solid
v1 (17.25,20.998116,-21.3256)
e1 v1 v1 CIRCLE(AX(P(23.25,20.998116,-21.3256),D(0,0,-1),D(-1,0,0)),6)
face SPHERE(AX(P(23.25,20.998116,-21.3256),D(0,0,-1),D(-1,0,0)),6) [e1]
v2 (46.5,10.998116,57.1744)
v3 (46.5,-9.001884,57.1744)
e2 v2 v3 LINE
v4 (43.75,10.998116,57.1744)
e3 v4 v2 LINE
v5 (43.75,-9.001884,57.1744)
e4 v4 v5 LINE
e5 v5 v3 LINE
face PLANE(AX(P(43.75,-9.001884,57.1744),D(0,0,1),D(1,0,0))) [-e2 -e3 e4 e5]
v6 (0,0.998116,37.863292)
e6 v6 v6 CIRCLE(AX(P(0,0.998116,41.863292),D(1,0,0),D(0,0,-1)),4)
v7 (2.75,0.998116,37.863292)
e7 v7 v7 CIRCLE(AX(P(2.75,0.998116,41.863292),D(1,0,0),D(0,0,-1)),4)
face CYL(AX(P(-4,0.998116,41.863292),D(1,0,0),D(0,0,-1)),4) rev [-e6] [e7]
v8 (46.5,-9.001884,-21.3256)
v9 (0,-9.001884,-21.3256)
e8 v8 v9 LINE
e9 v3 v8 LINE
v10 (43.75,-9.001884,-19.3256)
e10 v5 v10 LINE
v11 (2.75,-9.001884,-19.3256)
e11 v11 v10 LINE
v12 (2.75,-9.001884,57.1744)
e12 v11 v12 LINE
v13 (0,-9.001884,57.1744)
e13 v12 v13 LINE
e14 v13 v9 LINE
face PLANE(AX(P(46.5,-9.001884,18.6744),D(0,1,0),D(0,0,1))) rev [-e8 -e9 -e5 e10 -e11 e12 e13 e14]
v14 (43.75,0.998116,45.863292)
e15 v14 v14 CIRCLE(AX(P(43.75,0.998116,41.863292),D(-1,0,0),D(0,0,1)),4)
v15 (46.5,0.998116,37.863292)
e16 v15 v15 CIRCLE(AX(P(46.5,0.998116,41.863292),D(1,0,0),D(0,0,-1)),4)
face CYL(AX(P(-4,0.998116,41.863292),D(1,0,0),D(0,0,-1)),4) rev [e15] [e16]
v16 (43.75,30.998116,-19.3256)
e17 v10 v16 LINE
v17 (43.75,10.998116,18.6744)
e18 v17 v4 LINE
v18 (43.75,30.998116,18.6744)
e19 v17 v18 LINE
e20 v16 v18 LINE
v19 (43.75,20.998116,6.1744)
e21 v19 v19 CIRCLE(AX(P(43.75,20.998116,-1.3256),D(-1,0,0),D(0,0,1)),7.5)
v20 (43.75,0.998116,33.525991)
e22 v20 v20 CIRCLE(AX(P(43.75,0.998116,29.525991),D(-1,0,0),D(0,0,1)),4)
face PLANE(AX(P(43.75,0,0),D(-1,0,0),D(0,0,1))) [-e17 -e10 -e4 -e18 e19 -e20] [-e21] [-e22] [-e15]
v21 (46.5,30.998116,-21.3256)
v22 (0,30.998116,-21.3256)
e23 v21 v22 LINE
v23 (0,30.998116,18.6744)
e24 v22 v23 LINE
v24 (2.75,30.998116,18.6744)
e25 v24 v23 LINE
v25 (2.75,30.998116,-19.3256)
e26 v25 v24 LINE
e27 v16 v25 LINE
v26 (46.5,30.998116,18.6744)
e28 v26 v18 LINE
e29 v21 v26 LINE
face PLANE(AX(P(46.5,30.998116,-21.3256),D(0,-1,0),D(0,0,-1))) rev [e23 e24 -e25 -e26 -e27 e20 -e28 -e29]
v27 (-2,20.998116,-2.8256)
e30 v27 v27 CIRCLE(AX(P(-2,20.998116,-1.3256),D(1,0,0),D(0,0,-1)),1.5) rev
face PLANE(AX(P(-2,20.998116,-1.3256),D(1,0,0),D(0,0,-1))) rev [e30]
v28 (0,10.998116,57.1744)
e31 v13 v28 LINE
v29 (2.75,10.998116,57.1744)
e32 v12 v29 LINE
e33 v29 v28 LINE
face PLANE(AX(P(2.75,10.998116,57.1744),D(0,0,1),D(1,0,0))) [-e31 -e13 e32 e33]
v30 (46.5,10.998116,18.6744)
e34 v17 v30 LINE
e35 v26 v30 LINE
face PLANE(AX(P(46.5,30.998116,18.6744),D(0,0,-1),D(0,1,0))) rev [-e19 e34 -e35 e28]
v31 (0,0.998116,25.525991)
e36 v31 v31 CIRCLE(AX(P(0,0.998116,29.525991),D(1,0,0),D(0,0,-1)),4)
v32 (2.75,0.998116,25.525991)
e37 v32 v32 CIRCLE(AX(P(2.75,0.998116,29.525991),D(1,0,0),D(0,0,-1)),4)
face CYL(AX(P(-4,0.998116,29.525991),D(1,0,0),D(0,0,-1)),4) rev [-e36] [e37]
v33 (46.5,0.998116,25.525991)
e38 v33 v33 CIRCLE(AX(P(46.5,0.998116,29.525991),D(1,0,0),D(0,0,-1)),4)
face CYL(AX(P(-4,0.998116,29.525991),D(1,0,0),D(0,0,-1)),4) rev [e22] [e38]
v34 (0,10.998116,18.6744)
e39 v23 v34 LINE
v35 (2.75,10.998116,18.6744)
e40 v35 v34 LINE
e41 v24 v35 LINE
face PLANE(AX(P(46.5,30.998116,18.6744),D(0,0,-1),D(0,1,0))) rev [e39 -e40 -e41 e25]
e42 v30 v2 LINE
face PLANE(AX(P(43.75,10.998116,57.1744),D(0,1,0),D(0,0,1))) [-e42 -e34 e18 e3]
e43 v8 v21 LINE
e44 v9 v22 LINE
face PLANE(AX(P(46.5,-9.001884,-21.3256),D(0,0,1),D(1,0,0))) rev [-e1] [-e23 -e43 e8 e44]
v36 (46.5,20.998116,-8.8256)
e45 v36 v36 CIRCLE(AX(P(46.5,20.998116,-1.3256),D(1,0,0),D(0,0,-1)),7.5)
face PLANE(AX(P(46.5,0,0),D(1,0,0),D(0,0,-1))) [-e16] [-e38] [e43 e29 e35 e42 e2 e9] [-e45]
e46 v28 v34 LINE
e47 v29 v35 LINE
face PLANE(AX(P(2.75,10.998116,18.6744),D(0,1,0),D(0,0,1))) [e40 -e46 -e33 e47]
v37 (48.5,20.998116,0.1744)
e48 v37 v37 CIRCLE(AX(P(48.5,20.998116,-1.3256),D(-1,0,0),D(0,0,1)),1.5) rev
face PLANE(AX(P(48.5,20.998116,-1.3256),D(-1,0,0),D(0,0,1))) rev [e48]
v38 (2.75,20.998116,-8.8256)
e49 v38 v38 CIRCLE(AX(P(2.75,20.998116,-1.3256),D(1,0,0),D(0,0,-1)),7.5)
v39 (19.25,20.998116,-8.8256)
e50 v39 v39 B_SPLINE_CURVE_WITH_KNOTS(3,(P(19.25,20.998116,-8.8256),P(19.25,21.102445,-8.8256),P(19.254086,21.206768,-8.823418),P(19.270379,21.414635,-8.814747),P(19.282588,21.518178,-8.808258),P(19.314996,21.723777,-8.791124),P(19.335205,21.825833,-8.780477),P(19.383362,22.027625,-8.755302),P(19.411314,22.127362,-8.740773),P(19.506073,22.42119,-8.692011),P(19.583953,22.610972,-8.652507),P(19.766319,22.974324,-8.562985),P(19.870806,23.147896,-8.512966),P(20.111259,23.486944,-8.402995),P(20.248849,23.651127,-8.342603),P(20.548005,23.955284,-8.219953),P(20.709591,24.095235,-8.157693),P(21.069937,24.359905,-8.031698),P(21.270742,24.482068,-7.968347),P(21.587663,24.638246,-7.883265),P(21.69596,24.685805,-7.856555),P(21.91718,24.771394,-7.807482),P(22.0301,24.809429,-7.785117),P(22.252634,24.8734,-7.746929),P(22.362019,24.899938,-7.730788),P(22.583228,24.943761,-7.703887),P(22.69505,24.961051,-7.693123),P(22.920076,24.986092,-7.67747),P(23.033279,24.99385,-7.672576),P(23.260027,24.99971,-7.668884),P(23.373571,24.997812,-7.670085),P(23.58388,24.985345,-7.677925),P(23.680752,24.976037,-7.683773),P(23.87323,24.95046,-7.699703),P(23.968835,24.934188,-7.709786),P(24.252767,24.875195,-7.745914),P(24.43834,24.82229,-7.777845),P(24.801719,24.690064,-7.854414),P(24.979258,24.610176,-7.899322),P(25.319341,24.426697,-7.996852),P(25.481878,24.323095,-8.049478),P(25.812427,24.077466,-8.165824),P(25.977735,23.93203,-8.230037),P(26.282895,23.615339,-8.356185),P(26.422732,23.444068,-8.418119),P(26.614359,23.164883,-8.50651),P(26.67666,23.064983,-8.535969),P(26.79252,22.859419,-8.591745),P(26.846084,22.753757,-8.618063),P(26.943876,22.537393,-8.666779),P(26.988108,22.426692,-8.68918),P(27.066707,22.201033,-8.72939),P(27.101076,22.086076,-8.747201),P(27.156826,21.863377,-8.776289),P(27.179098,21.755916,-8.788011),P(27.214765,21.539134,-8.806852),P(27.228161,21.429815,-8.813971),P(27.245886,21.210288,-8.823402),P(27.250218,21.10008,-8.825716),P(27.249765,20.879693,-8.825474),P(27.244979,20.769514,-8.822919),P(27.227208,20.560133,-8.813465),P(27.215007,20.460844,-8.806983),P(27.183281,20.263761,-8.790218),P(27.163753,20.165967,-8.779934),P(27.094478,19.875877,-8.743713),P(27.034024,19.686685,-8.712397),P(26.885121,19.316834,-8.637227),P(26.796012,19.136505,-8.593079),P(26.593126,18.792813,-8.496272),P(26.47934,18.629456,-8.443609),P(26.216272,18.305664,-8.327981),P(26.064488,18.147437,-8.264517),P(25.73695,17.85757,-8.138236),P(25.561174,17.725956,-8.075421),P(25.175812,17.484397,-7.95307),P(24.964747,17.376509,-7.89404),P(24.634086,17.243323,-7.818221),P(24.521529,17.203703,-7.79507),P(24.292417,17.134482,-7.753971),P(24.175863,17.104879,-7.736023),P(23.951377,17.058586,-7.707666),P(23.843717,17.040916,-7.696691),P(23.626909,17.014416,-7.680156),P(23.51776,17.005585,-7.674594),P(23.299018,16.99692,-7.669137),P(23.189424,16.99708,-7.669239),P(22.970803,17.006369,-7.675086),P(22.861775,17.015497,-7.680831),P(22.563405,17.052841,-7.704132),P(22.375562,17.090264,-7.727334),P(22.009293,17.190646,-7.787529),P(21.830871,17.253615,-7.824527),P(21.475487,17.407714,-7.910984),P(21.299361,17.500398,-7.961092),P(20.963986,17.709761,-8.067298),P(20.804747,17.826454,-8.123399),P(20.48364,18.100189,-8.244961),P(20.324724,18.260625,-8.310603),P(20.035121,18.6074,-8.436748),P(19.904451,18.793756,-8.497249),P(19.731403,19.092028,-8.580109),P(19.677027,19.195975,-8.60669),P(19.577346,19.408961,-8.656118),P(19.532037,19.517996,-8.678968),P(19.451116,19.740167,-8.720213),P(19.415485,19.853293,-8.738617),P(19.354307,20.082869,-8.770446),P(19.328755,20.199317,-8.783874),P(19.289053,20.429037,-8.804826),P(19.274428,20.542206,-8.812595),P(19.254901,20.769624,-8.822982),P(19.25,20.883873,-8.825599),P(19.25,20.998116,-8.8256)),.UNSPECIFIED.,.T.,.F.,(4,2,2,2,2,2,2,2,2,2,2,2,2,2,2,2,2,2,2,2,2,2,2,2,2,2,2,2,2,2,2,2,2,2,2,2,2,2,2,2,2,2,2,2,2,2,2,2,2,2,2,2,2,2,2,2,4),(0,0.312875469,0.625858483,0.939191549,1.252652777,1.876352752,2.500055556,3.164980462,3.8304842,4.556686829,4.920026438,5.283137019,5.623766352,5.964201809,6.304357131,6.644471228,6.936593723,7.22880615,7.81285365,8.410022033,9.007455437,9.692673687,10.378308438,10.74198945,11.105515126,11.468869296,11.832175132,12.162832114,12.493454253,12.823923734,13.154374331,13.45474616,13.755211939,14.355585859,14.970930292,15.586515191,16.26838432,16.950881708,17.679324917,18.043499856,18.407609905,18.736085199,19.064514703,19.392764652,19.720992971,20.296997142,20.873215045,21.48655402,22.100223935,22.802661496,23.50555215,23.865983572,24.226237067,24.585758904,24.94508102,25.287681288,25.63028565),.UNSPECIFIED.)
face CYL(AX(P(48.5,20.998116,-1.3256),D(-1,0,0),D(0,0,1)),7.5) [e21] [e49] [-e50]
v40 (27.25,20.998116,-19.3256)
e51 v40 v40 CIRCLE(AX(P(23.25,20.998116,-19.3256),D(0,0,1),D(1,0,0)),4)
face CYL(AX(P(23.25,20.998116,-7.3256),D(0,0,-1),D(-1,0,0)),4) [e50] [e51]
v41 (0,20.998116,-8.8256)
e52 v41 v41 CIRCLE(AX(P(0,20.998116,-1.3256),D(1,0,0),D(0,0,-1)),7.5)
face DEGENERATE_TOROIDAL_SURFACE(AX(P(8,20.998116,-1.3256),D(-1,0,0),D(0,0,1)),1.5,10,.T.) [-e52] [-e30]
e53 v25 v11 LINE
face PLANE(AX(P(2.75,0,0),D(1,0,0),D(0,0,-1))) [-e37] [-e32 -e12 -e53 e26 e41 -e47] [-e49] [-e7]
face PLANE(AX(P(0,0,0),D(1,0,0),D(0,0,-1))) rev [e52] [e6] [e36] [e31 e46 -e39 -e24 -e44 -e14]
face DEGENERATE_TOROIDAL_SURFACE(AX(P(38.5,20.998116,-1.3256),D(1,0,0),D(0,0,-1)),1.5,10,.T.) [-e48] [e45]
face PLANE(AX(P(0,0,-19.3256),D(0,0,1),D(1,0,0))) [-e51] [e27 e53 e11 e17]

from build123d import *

# Parameters (mm, degrees)
SKETCH_1_W          = 40
SKETCH_1_H          = 40
EXTRUDE_2_DEPTH     = 46.5
SKETCH_3_W          = 38.5
SKETCH_3_H          = 20
EXTRUDE_3_DEPTH     = 2.75
SKETCH_4_W          = 38.5
SKETCH_4_H          = 20
EXTRUDE_4_DEPTH     = 2.75
CUT_EXTRUDE_1_DEPTH = 38
SKETCH_6_R          = 7.5
EXTRUDE_5_DEPTH     = 48.5
EXTRUDE_START       = -50.5
SKETCH_7_R          = 7.5
EXTRUDE_6_DEPTH     = 50.5
FILLET_1_R          = 10
SKETCH_8_R          = 4
CUT_EXTRUDE_2_DEPTH = 50.5
SKETCH_9_R          = 6
EXTRUDE_7_DEPTH     = 6
SKETCH_10_R         = 4
EXTRUDE_9_DEPTH     = 20
FILLET_3_R          = 6


# Some blends are built 0.0001 mm under size
with BuildPart() as part:
    # 草图1 → 凸台-拉伸2 (new body)
    with BuildSketch(Plane(origin=(0, 0, 0), x_dir=(0, 0, -1), z_dir=(1, 0, 0))):
        with Locations((1.325599553, 10.998115505)):
            Rectangle(SKETCH_1_W, SKETCH_1_H)
    extrude(amount=EXTRUDE_2_DEPTH)

    # 草图3 → 凸台-拉伸3 (add)
    with BuildSketch(Plane(origin=(46.5, 0, 0), x_dir=(0, 0, -1), z_dir=(1, 0, 0))):
        with Locations((-37.924400447, 0.998115505)):
            Rectangle(SKETCH_3_W, SKETCH_3_H)
    extrude(amount=-EXTRUDE_3_DEPTH)

    # 草图4 → 凸台-拉伸4 (add)
    with BuildSketch(Plane.ZY):
        with Locations((37.924400447, 0.998115505)):
            Rectangle(SKETCH_4_W, SKETCH_4_H)
    extrude(amount=-EXTRUDE_4_DEPTH)

    # 草图5 → 切除-拉伸1 (cut)
    with BuildSketch(Plane.XY.offset(18.674400447)):
        Polygon((2.75, 10.998115505), (2.75, 30.998115505), (43.75, 30.998115505), (43.75, 10.998115505), (43.75, -9.001884495), (2.75, -9.001884495), align=None)
    extrude(amount=-CUT_EXTRUDE_1_DEPTH, mode=Mode.SUBTRACT)

    # 草图6 → 凸台-拉伸5 (add)
    with BuildSketch(Plane.ZY):
        with Locations((-1.325599553, 20.998115505)):
            Circle(SKETCH_6_R)
    extrude(amount=-EXTRUDE_5_DEPTH)

    # 草图7 → 凸台-拉伸6 (add)
    with BuildSketch(Plane(origin=(48.5, 0, 0), x_dir=(0, 0, -1), z_dir=(1, 0, 0)).offset(EXTRUDE_START)):
        with Locations(Location((1.325599553, 20.998115505, 0), (0, 0, 180))):
            Circle(SKETCH_7_R)
    extrude(amount=EXTRUDE_6_DEPTH)

    # 圆角1
    # the kernel refuses this fillet: 10 mm, written as the material it takes off along each edge
    with BuildSketch(Plane(origin=(48.5, 20.998115505, -1.325599553), x_dir=(0, 0, 1), z_dir=(0, -1, 0))) as fillet_1_piece_1:
        with BuildLine():
            CenterArc((1.5, 10), FILLET_1_R, 270, 36.869897646)
            Line((1.5, 0), (1.5, -0.2))
            Line((1.5, -0.2), (7.5, -0.2))
            Line((7.5, -0.2), (7.7, 0))
            ThreePointArc((7.7, 0), (7.7, 1), (7.62, 1.84))
            Line((7.62, 1.84), (7.5, 2))
        make_face()
    revolve(axis=Axis((48.5, 20.998115505, -1.325599553), (-1, 0, 0)), mode=Mode.SUBTRACT)
    with BuildSketch(Plane(origin=(-2, 20.998115505, -1.325599553), x_dir=(0, 0, 1), z_dir=(0, 1, 0))) as fillet_1_piece_2:
        with BuildLine():
            CenterArc((1.5, 10), FILLET_1_R, 270, 36.869897646)
            Line((1.5, 0), (1.5, -0.2))
            Line((1.5, -0.2), (7.5, -0.2))
            Line((7.5, -0.2), (7.7, 0))
            ThreePointArc((7.7, 0), (7.7, 1), (7.62, 1.84))
            Line((7.62, 1.84), (7.5, 2))
        make_face()
    revolve(axis=Axis((-2, 20.998115505, -1.325599553), (1, 0, 0)), mode=Mode.SUBTRACT)

    # 草图8 → 切除-拉伸2 (cut)
    with BuildSketch(Plane(origin=(46.5, 0, 0), x_dir=(0, 0, -1), z_dir=(1, 0, 0))):
        with Locations((-41.863292437, 0.998115505)):
            Circle(SKETCH_8_R)
        with Locations((-29.525991128, 0.998115505)):
            Circle(SKETCH_8_R)
    extrude(amount=-CUT_EXTRUDE_2_DEPTH, mode=Mode.SUBTRACT)

    # 草图9 → 凸台-拉伸7 (add)
    with BuildSketch(Plane(origin=(0, 0, -21.325599553), x_dir=(-1, 0, 0), z_dir=(0, 0, -1))):
        with Locations((-23.25, 20.998115505)):
            Circle(SKETCH_9_R)
    extrude(amount=EXTRUDE_7_DEPTH)

    # 草图10 → 凸台-拉伸9 (add)
    with BuildSketch(Plane(origin=(0, 0, -27.325599553), x_dir=(-1, 0, 0), z_dir=(0, 0, -1))):
        with Locations((-23.25, 20.998115505)):
            Circle(SKETCH_10_R)
    extrude(amount=-EXTRUDE_9_DEPTH)

    # 圆角3
    fillet_3_edges = [part.edges().sort_by_distance(p)[0] for p in [
        (29.25, 20.998115505, -27.325599553),
    ]]
    fillet(fillet_3_edges, radius=FILLET_3_R - 0.0001)  # a hair under: the kernel refuses the full size


solid = part.part
